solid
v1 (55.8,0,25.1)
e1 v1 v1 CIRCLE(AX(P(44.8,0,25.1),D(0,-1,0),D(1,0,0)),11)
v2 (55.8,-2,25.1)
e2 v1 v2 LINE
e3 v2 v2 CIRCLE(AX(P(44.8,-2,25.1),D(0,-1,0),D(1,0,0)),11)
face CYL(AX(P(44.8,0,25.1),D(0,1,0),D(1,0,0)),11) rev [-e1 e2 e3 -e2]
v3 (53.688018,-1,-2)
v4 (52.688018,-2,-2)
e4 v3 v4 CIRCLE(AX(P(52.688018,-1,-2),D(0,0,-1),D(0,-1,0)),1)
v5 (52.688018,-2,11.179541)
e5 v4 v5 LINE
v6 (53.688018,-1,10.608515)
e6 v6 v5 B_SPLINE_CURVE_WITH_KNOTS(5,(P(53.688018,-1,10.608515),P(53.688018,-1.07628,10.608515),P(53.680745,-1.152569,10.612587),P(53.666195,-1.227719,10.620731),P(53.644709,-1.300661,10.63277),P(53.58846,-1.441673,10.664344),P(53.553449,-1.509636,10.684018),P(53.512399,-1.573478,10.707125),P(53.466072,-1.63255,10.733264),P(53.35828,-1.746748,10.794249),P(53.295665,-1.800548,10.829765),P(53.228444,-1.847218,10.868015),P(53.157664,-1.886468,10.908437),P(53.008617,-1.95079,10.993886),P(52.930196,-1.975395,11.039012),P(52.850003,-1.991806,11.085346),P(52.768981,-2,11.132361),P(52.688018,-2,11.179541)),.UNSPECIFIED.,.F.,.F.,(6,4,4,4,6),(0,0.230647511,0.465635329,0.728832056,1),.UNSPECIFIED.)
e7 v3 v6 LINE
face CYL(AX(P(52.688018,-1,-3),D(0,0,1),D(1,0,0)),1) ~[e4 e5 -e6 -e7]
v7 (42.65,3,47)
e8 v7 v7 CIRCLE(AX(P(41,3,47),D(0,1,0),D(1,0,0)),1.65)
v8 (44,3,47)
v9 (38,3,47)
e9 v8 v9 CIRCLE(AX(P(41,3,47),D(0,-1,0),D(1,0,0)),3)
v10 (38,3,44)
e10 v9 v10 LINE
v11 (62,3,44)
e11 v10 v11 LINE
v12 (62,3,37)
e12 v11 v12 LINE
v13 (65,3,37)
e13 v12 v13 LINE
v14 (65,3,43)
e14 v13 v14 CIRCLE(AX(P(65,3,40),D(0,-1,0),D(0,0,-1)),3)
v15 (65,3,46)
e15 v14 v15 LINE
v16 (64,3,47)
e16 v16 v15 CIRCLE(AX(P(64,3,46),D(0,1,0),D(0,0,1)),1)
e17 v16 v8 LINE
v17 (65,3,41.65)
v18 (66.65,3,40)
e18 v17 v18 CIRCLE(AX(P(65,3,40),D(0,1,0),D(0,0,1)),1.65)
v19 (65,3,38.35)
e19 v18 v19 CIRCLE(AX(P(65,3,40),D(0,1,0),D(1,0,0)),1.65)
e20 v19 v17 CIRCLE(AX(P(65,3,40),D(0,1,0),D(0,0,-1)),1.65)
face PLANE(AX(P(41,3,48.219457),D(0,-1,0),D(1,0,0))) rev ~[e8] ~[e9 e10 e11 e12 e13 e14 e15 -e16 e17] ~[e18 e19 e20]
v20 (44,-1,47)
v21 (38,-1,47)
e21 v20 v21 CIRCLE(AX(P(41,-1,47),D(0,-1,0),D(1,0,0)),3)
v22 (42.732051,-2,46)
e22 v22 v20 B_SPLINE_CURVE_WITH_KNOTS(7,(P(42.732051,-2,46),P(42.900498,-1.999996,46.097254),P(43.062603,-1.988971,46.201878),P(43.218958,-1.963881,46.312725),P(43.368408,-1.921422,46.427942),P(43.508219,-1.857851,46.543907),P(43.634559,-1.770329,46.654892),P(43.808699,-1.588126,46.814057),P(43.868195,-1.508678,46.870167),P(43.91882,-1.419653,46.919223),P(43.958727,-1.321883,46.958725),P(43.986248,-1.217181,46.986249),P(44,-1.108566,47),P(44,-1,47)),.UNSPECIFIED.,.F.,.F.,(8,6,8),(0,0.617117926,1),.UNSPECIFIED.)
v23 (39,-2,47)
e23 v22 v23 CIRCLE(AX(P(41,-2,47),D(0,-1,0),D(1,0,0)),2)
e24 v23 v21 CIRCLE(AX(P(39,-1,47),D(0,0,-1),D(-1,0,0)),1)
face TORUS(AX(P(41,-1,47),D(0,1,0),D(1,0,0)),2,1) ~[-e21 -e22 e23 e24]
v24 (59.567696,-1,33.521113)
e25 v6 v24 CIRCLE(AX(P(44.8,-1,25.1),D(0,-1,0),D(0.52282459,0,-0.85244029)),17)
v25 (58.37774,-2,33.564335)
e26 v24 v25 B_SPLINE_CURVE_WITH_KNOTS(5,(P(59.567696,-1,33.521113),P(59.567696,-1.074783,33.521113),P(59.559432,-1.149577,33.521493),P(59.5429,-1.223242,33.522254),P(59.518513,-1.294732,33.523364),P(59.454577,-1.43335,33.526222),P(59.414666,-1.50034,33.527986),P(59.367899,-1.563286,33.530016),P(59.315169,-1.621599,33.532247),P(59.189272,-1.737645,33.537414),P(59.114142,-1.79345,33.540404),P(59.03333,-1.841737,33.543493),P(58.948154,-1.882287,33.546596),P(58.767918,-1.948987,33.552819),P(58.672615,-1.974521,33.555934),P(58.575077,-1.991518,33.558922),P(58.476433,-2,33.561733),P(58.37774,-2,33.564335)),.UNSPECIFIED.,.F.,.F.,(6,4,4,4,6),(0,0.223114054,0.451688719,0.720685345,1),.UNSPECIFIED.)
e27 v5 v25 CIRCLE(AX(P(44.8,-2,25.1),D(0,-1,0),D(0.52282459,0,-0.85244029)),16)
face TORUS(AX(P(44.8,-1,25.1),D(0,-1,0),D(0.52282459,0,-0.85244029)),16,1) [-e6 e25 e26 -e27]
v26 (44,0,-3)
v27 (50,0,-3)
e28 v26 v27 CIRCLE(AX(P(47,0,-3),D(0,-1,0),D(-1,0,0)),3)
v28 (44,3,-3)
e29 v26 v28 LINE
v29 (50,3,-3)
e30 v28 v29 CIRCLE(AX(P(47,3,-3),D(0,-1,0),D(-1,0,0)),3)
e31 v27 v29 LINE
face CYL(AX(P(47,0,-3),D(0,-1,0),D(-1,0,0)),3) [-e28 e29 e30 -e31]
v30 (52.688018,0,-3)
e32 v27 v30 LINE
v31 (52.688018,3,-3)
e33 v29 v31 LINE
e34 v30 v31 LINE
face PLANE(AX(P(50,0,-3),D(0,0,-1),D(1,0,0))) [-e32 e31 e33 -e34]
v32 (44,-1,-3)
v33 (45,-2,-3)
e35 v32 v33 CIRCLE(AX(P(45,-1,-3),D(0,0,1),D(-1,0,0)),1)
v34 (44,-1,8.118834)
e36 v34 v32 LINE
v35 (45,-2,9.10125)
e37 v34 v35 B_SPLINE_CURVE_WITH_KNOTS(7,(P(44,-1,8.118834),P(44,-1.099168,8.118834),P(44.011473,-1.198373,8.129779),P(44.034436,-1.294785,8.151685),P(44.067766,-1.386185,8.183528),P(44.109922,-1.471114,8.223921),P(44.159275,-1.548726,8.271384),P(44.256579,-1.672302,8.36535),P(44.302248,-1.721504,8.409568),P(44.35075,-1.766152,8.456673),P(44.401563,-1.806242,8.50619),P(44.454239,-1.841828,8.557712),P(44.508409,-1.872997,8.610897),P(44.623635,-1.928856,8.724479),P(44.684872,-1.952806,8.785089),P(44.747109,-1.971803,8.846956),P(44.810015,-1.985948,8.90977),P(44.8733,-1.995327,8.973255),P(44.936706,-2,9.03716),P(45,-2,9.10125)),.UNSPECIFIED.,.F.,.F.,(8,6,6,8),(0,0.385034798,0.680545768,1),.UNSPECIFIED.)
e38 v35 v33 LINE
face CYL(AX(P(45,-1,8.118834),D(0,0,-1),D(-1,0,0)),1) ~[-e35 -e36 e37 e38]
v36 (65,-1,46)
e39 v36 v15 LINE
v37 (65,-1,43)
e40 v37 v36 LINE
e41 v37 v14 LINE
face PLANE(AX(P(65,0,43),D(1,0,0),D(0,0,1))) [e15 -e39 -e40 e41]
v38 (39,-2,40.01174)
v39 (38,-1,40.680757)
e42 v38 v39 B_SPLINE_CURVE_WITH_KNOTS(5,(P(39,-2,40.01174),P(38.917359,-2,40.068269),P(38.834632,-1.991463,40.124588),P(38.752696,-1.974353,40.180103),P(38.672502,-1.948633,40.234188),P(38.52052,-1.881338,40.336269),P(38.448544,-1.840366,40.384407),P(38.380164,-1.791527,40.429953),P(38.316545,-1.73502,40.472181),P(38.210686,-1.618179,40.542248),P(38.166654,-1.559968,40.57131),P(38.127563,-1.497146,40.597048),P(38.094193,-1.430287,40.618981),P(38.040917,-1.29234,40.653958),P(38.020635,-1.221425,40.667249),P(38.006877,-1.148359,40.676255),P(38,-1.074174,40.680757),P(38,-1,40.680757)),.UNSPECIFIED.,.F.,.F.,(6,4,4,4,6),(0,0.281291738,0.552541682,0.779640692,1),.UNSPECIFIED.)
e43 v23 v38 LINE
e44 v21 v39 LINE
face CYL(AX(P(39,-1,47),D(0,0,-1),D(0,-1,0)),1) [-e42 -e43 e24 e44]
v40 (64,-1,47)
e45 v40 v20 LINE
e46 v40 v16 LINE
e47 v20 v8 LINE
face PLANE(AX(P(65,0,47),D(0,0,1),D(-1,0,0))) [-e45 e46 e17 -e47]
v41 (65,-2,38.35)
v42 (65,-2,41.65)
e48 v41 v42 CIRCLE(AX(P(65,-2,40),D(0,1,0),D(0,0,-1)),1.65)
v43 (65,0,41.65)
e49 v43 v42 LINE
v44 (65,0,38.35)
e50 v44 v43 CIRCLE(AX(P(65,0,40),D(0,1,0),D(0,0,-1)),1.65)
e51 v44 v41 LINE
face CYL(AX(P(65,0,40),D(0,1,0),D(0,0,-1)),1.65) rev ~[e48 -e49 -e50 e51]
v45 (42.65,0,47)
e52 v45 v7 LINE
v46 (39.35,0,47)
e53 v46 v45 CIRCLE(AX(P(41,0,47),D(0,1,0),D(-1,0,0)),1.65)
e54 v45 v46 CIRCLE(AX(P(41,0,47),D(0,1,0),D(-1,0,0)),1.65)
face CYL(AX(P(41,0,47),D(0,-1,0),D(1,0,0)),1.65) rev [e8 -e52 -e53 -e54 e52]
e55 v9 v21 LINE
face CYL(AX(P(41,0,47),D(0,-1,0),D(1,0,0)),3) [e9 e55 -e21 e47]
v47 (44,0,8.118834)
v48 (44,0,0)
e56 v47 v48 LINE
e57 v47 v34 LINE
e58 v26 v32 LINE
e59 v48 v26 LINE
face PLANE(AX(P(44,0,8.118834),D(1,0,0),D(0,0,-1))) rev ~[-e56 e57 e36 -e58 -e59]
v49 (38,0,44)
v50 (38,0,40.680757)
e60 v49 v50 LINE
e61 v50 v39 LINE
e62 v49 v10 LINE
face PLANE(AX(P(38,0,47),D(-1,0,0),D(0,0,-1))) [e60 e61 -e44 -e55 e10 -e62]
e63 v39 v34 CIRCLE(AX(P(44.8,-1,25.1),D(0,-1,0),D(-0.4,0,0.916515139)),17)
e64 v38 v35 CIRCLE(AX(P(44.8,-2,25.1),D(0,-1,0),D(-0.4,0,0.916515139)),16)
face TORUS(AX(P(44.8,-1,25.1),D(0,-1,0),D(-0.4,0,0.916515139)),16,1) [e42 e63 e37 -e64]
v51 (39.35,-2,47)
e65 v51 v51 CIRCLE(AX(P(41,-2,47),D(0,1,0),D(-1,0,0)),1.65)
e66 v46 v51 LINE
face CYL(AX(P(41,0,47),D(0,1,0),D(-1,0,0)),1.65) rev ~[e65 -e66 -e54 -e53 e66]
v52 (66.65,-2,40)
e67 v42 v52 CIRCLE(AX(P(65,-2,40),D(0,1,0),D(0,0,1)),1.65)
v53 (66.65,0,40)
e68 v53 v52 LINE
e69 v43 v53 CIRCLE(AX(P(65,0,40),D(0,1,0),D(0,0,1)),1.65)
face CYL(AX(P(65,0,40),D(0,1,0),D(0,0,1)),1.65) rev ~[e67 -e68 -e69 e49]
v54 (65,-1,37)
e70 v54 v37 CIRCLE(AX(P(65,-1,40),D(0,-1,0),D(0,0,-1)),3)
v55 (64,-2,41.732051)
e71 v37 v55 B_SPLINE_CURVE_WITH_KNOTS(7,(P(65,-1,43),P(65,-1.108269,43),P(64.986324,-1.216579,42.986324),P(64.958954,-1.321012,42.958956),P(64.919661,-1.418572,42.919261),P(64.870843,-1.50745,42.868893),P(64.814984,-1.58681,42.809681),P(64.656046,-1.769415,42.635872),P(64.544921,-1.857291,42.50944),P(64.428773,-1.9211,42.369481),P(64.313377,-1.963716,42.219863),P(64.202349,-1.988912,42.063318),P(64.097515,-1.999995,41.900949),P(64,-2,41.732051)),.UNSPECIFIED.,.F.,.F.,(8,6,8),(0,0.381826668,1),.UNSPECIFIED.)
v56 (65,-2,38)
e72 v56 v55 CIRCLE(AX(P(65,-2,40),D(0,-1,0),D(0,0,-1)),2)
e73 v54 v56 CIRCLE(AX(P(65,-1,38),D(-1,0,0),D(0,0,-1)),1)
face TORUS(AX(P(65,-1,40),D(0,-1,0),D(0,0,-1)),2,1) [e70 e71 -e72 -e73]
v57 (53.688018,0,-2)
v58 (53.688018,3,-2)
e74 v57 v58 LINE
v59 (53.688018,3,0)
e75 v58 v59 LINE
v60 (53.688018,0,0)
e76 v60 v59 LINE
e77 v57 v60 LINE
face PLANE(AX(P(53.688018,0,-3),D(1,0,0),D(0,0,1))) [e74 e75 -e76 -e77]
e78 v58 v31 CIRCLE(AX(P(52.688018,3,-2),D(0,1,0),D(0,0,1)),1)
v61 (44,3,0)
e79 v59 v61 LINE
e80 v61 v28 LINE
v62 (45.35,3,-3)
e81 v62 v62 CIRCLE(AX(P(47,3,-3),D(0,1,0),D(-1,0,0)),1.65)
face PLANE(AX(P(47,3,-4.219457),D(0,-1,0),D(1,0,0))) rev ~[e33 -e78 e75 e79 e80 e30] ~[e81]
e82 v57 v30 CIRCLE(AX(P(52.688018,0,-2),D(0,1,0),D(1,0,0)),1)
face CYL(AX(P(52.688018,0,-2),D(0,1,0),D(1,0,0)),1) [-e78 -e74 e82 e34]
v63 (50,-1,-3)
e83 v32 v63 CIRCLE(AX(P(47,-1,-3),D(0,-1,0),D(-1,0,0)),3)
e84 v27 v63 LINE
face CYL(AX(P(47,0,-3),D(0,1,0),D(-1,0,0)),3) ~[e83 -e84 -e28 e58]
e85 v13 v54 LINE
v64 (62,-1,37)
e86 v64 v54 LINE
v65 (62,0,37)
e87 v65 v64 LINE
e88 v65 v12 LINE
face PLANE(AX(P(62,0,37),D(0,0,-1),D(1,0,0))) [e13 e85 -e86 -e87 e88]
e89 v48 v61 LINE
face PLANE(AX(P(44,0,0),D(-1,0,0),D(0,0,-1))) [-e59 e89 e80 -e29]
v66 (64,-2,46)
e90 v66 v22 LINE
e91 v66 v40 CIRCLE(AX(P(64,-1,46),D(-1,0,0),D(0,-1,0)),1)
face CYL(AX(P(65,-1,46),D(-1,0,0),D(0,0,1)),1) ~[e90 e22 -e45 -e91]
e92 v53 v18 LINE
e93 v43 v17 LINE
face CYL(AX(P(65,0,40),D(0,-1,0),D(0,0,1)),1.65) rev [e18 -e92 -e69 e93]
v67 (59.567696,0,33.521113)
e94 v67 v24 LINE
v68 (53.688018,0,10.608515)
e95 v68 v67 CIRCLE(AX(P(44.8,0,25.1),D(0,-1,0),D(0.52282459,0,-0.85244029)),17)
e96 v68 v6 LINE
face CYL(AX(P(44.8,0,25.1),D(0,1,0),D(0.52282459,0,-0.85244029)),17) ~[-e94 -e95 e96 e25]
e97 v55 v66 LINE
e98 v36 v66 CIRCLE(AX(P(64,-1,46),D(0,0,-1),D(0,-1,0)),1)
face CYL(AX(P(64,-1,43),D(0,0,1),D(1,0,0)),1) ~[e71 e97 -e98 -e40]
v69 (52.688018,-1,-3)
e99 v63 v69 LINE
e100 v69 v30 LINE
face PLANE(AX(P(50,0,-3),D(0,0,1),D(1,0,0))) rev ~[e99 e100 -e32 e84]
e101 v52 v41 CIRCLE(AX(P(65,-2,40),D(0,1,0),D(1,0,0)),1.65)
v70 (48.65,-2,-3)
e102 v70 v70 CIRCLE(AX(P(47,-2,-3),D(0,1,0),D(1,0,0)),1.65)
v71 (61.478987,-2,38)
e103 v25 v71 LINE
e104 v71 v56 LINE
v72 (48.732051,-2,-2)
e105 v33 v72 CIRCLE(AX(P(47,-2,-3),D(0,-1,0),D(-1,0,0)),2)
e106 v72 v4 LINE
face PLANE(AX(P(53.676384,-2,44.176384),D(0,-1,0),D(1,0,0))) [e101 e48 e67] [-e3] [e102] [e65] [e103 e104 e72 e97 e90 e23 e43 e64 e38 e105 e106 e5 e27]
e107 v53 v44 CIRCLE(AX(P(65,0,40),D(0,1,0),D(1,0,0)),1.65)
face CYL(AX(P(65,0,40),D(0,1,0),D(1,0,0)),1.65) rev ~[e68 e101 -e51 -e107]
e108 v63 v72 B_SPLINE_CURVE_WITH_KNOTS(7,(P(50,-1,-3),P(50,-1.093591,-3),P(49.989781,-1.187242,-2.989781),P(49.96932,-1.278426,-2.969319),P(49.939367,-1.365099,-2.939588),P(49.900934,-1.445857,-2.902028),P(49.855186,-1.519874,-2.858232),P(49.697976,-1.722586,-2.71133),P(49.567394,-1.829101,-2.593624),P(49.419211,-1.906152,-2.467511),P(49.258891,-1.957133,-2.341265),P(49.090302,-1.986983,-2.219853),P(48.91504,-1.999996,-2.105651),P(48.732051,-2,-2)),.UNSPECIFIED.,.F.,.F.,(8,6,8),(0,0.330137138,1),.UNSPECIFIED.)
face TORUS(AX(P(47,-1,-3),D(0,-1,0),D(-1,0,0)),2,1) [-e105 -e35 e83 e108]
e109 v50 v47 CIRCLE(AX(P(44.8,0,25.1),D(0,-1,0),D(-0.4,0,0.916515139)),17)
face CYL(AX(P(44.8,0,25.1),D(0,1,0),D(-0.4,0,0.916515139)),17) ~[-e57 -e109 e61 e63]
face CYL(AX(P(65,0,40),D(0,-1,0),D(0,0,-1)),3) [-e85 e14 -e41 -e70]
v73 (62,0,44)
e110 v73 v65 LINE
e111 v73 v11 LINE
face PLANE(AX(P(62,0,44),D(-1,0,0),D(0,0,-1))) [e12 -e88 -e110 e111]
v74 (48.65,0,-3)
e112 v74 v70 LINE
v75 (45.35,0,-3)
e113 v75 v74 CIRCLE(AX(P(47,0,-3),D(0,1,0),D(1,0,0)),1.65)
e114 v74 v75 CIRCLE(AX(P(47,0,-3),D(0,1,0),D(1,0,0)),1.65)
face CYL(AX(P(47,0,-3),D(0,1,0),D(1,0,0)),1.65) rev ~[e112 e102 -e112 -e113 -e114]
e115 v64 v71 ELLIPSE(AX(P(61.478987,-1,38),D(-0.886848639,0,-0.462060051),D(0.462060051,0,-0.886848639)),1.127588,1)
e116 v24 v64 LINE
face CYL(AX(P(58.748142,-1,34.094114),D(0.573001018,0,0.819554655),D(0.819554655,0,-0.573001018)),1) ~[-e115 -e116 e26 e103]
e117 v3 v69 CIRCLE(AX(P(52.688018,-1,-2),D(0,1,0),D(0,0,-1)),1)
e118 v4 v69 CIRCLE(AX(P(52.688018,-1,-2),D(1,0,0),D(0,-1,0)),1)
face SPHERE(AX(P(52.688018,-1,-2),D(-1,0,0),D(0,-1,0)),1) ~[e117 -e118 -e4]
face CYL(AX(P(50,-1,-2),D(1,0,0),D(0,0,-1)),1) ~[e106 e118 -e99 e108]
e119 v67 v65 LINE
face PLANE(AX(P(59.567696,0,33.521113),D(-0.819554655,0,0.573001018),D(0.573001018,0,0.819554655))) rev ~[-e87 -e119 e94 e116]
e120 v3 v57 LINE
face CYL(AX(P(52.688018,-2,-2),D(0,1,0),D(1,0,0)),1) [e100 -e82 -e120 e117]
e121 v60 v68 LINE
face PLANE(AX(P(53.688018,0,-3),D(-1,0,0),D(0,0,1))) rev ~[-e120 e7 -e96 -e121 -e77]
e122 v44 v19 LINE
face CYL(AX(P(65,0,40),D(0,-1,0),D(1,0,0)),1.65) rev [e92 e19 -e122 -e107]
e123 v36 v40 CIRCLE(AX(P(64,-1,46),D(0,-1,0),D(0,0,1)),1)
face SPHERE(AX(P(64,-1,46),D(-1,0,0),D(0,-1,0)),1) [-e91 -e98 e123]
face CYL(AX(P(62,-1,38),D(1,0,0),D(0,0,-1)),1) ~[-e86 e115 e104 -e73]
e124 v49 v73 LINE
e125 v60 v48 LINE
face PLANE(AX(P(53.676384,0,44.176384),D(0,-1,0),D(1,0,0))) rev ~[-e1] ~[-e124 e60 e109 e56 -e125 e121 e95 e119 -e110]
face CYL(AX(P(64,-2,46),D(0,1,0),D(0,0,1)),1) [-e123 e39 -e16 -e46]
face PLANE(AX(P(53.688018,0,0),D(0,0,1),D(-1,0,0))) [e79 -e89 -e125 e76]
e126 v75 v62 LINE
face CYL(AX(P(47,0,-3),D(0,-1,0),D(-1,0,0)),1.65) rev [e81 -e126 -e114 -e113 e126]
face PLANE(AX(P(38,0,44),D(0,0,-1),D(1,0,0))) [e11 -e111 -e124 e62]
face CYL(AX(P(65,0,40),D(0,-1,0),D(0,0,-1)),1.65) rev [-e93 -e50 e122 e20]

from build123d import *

# Parameters (mm, degrees)
F0_R     = 11
F1_DEPTH = 2
F2_DEPTH = 3
F3_R     = 1


with BuildPart() as f1:
    # F0 (on Front) → F1 (new body)
    with BuildSketch(Plane.XZ):
        with BuildLine():
            Line((38, 47), (38, 44))
            Line((38, 44), (62, 44))
            Line((62, 44), (62, 37))
            Line((62, 37), (65, 37))
            Line((65, 37), (65, 38.35))
            ThreePointArc((65, 38.35), (63.35, 40), (65, 41.65))
            Line((65, 41.65), (65, 43))
            Line((65, 43), (65, 47))
            Line((65, 47), (44, 47))
            Line((44, 47), (42.65, 47))
            ThreePointArc((42.65, 47), (41, 45.35), (39.35, 47))
            Line((39.35, 47), (38, 47))
        make_face()
        with BuildLine():
            ThreePointArc((44, 47), (41, 50), (38, 47))
            Line((38, 47), (39.35, 47))
            ThreePointArc((39.35, 47), (41, 48.65), (42.65, 47))
            Line((42.65, 47), (44, 47))
        make_face()
        with BuildLine():
            Line((62, 44), (38, 44))
            Line((38, 44), (38, 40.6807573628))
            ThreePointArc((38, 40.6807573628), (28.0814559879, 22.0193692019), (44, 8.1188339623))
            Line((44, 8.1188339623), (44, 0))
            Line((44, 0), (53.6880180275, 0))
            Line((53.6880180275, 0), (53.6880180275, 10.6085150677))
            ThreePointArc((53.6880180275, 10.6085150677), (61.2664808606, 20.8744813256), (59.5676963486, 33.5211130236))
            Line((59.5676963486, 33.5211130236), (62, 37))
            Line((62, 37), (62, 44))
        make_face()
        with Locations((44.8, 25.1)):
            Circle(F0_R, mode=Mode.SUBTRACT)
        with BuildLine():
            Line((53.6880180275, 0), (44, 0))
            Line((44, 0), (44, -3))
            Line((44, -3), (45.35, -3))
            ThreePointArc((45.35, -3), (47, -1.35), (48.65, -3))
            Line((48.65, -3), (50, -3))
            Line((50, -3), (53.6880180275, -3))
            Line((53.6880180275, -3), (53.6880180275, 0))
        make_face()
        with BuildLine():
            Line((45.35, -3), (44, -3))
            ThreePointArc((44, -3), (47, -6), (50, -3))
            Line((50, -3), (48.65, -3))
            ThreePointArc((48.65, -3), (47, -4.65), (45.35, -3))
        make_face()
        with BuildLine():
            Line((65, 38.35), (65, 37))
            ThreePointArc((65, 37), (68, 40), (65, 43))
            Line((65, 43), (65, 41.65))
            ThreePointArc((65, 41.65), (66.166726189, 41.166726189), (66.65, 40))
            ThreePointArc((66.65, 40), (66.166726189, 38.833273811), (65, 38.35))
        make_face()
    extrude(amount=F1_DEPTH)

    # F0 (on Front) → F2 (join)
    with BuildSketch(Plane.XZ):
        with BuildLine():
            ThreePointArc((44, 47), (41, 50), (38, 47))
            Line((38, 47), (39.35, 47))
            ThreePointArc((39.35, 47), (41, 48.65), (42.65, 47))
            Line((42.65, 47), (44, 47))
        make_face()
        with BuildLine():
            Line((38, 47), (38, 44))
            Line((38, 44), (62, 44))
            Line((62, 44), (62, 37))
            Line((62, 37), (65, 37))
            Line((65, 37), (65, 38.35))
            ThreePointArc((65, 38.35), (63.35, 40), (65, 41.65))
            Line((65, 41.65), (65, 43))
            Line((65, 43), (65, 47))
            Line((65, 47), (44, 47))
            Line((44, 47), (42.65, 47))
            ThreePointArc((42.65, 47), (41, 45.35), (39.35, 47))
            Line((39.35, 47), (38, 47))
        make_face()
        with BuildLine():
            Line((65, 38.35), (65, 37))
            ThreePointArc((65, 37), (68, 40), (65, 43))
            Line((65, 43), (65, 41.65))
            ThreePointArc((65, 41.65), (66.166726189, 41.166726189), (66.65, 40))
            ThreePointArc((66.65, 40), (66.166726189, 38.833273811), (65, 38.35))
        make_face()
        with BuildLine():
            Line((45.35, -3), (44, -3))
            ThreePointArc((44, -3), (47, -6), (50, -3))
            Line((50, -3), (48.65, -3))
            ThreePointArc((48.65, -3), (47, -4.65), (45.35, -3))
        make_face()
        with BuildLine():
            Line((53.6880180275, 0), (44, 0))
            Line((44, 0), (44, -3))
            Line((44, -3), (45.35, -3))
            ThreePointArc((45.35, -3), (47, -1.35), (48.65, -3))
            Line((48.65, -3), (50, -3))
            Line((50, -3), (53.6880180275, -3))
            Line((53.6880180275, -3), (53.6880180275, 0))
        make_face()
    extrude(amount=-F2_DEPTH)

    # F3
    f3_edges = [f1.edges().sort_by_distance(p)[0] for p in [
        (38, -2, 43.840379),
        (41, -2, 50),
        (54.5, -2, 47),
        (65, -2, 45),
        (68, -2, 40),
        (63.5, -2, 37),
        (60.783848, -2, 35.260557),
        (61.266481, -2, 20.874481),
        (44, -2, 2.559417),
        (47, -2, -6),
        (51.844009, -2, -3),
        (53.688018, -2, 3.804258),
        (65, 0.5, 47),
        (53.688018, 0.5, -3),
        (28.081456, -2, 22.019369),
    ]]
    fillet(f3_edges, radius=F3_R)


solid = f1.part
